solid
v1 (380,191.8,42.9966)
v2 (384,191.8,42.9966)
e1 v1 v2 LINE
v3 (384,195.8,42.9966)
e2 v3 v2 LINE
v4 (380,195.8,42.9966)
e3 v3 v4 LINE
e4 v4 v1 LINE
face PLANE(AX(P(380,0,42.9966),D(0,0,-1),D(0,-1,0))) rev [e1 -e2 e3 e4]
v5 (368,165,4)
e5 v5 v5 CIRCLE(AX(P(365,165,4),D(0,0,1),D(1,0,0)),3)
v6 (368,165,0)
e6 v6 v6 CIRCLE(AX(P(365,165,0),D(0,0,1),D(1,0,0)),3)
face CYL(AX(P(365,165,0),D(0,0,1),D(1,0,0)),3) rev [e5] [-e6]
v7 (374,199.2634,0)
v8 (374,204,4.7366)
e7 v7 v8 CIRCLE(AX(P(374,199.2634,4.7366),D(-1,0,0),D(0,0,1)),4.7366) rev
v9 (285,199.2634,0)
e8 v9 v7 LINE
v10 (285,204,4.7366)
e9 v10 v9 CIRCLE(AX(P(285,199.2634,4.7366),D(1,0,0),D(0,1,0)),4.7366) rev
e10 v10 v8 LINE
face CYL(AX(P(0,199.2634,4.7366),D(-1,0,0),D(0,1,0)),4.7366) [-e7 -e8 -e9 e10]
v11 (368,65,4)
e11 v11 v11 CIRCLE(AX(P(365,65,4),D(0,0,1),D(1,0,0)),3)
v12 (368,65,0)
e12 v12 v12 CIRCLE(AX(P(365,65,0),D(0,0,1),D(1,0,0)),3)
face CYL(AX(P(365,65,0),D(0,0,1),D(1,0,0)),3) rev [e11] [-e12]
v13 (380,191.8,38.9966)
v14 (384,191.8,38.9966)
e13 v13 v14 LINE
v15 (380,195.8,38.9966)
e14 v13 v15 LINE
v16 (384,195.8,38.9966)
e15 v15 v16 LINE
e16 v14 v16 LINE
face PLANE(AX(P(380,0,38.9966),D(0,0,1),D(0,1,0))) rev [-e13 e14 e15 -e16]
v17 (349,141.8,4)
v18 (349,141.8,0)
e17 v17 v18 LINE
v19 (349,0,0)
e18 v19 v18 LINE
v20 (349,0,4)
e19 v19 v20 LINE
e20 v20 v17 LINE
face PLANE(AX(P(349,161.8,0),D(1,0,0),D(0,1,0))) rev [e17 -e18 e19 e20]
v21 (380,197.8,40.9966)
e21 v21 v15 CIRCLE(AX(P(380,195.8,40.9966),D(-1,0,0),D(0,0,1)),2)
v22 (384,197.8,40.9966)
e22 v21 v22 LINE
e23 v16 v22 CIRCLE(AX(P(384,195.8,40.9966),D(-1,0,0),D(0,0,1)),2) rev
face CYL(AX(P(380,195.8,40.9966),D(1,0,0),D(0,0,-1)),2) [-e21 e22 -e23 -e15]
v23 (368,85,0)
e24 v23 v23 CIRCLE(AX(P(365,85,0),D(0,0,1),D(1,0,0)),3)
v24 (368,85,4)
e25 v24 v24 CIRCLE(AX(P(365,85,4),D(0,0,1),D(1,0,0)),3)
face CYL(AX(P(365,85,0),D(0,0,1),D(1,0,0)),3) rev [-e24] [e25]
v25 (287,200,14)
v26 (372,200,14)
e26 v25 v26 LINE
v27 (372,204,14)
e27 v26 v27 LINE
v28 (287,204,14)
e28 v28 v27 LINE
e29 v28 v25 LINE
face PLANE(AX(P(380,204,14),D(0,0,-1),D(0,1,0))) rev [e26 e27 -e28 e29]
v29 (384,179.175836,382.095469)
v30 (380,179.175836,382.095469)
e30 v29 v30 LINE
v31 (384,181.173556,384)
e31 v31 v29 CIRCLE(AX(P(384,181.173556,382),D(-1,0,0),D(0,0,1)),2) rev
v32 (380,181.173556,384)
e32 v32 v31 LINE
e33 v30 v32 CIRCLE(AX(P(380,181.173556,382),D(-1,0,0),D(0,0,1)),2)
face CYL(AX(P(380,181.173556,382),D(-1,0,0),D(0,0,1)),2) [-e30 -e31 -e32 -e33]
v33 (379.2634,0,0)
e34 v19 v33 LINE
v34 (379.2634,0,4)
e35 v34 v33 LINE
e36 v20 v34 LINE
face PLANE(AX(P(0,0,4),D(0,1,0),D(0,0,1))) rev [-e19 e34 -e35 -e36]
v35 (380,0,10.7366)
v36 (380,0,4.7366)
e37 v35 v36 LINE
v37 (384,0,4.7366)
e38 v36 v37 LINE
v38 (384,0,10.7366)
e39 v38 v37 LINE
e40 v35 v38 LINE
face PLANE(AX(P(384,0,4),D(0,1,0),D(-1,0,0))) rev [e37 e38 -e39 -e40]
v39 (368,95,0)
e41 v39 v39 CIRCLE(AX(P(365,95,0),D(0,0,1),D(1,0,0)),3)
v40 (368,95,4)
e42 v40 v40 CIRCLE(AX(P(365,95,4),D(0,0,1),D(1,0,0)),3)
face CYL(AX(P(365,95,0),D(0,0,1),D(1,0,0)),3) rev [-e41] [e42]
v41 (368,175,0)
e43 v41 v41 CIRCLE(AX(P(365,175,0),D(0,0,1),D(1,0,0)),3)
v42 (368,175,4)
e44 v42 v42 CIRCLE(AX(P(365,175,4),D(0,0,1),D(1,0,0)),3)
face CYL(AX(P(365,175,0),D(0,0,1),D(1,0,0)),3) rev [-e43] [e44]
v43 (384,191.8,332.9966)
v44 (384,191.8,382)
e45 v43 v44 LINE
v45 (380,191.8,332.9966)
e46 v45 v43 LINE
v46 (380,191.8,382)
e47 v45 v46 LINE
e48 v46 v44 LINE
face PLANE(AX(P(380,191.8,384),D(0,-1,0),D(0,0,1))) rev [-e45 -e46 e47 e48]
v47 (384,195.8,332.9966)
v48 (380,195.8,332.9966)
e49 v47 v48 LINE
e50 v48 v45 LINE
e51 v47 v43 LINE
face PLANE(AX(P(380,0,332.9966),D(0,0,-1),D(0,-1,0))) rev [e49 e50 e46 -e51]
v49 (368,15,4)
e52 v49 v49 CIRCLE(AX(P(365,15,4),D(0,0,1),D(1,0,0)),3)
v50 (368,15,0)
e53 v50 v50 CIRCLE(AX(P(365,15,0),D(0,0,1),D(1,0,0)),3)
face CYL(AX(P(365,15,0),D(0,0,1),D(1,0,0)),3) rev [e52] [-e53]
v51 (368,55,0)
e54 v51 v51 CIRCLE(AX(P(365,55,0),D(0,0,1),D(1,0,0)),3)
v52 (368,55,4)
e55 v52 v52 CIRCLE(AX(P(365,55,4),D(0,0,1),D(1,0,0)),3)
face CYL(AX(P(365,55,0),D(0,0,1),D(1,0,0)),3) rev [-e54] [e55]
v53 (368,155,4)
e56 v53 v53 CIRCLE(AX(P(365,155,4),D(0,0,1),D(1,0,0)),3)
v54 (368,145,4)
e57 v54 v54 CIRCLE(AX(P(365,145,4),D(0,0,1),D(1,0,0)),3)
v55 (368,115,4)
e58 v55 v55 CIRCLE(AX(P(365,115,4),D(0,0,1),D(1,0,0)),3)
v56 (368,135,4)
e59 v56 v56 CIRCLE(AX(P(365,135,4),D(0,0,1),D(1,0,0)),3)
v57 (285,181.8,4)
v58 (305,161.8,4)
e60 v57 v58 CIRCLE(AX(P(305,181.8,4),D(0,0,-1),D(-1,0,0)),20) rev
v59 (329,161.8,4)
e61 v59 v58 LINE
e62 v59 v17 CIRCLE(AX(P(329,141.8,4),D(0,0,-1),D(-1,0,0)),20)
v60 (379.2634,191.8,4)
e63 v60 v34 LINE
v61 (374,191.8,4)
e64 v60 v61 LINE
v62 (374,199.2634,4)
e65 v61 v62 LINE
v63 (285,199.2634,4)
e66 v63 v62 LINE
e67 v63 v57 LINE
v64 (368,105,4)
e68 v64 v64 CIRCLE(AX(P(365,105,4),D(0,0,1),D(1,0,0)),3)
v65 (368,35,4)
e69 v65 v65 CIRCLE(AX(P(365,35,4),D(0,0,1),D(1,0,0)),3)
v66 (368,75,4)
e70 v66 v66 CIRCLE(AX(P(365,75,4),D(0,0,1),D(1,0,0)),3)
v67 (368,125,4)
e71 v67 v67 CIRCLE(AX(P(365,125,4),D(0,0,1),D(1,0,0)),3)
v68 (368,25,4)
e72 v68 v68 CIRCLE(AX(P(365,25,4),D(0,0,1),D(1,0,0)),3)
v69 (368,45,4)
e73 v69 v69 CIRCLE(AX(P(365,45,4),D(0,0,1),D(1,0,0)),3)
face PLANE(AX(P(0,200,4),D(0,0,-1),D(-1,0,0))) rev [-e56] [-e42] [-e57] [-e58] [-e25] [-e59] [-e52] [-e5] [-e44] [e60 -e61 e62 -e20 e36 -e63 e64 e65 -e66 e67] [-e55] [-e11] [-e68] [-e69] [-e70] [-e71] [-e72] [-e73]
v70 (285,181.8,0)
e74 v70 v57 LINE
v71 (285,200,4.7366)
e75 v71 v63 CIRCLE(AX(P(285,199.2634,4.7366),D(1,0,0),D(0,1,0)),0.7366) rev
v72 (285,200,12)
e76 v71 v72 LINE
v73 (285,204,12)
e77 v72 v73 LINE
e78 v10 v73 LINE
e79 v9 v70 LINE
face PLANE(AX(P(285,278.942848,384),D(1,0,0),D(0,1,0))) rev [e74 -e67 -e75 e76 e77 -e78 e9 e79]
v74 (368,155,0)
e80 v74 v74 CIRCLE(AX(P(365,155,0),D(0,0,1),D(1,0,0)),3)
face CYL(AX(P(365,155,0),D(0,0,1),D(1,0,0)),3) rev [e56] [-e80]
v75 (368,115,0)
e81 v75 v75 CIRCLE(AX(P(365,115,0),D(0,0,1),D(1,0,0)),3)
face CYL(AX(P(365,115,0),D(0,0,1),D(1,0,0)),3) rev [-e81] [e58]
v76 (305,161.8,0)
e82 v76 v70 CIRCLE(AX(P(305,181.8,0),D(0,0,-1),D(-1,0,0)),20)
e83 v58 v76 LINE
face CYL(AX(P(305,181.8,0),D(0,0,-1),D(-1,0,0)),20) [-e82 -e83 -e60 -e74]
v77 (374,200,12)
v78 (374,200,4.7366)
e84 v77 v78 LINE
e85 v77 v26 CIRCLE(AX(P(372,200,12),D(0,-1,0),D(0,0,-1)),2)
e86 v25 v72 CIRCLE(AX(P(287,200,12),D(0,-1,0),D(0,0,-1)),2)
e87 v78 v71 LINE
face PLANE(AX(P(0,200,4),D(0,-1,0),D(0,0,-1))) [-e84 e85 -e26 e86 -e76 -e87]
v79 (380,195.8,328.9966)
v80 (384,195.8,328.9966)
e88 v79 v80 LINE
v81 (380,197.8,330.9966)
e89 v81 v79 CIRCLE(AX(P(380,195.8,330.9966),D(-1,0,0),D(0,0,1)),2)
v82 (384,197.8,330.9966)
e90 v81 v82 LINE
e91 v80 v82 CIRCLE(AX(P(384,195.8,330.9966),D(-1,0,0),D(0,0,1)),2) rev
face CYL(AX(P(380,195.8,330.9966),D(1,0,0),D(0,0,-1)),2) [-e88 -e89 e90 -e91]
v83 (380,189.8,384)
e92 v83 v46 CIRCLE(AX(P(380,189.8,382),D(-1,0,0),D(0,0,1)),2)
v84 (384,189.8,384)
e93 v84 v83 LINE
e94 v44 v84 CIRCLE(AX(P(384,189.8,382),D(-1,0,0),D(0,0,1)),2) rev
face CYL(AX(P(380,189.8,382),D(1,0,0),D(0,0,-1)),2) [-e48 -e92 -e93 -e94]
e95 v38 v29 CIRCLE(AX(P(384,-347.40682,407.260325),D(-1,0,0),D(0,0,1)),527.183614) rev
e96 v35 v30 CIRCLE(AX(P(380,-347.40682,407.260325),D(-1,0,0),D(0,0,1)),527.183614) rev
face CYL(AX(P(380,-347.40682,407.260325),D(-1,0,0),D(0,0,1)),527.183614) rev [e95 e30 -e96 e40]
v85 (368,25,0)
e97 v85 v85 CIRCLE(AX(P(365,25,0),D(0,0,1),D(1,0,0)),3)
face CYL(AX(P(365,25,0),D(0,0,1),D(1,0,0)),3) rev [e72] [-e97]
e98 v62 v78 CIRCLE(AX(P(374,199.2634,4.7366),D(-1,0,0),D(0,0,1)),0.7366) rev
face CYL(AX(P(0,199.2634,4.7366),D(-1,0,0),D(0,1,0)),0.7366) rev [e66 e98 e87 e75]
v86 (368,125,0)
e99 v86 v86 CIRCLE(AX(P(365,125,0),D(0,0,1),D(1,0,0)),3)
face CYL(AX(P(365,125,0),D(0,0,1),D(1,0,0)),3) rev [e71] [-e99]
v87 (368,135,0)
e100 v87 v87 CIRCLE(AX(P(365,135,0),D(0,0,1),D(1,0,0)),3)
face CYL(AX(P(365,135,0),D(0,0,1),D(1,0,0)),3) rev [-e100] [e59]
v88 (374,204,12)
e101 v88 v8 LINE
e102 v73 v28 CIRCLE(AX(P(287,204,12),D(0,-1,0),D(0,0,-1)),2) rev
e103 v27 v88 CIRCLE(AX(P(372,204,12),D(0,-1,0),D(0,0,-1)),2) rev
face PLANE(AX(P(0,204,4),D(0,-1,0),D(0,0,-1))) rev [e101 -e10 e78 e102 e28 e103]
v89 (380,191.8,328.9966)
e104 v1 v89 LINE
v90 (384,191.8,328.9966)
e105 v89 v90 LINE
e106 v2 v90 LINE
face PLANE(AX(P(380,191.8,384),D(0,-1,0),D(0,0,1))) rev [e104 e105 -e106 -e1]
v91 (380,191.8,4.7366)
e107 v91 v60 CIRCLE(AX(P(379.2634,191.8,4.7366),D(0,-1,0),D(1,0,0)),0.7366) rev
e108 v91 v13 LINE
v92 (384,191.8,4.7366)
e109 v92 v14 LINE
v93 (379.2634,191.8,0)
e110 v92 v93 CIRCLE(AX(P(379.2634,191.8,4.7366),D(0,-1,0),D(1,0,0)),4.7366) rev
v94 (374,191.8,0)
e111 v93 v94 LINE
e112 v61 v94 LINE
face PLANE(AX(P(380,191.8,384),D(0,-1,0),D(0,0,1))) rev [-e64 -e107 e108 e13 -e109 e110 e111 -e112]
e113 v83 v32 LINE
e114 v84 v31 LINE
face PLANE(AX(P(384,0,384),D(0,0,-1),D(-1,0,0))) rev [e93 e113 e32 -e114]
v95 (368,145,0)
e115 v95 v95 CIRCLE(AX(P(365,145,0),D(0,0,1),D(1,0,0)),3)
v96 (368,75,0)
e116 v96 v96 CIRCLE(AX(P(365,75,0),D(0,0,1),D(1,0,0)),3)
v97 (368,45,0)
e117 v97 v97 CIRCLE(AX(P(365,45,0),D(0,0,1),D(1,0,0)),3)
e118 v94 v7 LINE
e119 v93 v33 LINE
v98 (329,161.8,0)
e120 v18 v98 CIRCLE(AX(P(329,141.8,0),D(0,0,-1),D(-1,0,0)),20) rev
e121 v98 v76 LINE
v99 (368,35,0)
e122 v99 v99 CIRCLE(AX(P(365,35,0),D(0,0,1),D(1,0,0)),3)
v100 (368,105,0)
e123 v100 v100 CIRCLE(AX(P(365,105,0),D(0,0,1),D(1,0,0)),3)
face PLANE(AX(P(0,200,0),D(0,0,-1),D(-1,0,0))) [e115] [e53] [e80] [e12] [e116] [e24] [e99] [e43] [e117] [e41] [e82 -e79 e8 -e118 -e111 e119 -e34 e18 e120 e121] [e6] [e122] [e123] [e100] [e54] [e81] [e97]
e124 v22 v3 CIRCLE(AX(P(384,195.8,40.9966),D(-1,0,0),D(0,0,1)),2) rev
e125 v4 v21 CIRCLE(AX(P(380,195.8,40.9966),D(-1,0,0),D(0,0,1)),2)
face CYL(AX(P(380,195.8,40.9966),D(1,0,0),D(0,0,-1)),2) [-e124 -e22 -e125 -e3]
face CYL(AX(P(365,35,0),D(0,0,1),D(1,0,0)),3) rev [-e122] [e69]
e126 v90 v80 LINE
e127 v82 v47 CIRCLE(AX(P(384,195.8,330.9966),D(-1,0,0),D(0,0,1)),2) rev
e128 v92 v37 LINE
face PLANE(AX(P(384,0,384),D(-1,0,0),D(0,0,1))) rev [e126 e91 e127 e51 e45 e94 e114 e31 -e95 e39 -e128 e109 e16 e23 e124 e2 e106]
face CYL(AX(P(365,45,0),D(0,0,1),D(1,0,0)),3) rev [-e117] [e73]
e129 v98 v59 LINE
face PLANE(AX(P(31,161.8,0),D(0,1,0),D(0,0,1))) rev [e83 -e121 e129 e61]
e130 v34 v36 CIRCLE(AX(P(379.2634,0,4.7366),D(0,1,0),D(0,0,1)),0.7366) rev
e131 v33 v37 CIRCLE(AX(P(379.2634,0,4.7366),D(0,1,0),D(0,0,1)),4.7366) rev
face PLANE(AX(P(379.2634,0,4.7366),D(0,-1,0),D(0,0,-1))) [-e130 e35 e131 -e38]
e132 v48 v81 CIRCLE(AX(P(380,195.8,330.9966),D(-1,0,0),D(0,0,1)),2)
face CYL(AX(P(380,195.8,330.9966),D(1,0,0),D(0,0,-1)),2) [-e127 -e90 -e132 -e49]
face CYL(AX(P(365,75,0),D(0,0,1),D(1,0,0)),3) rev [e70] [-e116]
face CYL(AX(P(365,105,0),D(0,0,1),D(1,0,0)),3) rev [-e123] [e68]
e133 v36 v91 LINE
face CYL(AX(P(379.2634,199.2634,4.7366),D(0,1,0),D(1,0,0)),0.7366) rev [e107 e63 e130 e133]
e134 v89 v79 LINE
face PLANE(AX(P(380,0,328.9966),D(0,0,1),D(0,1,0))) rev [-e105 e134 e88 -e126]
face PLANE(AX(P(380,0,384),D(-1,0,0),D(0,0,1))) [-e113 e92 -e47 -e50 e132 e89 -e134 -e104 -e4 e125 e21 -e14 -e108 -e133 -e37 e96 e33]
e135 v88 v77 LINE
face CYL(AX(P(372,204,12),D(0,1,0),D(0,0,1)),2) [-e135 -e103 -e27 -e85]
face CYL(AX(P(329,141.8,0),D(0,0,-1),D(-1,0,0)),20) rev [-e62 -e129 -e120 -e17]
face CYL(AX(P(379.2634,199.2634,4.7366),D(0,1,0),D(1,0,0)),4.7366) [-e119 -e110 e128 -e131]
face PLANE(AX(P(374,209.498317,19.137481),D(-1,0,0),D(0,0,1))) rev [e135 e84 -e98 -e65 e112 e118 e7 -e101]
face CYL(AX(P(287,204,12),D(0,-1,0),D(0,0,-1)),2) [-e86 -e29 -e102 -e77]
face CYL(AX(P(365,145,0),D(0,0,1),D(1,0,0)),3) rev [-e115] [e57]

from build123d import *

# Parameters (mm, degrees)
SKETCH1_W                    = 380
SKETCH1_H                    = 200
BASE_FLANGE1_DEPTH           = 4
EDGE_FLANGE1_STRIP_W         = 17.4732
EDGE_FLANGE1_STRIP_H         = 4
EDGE_FLANGE1_STRIP_CUT_DEPTH = 380
EDGE_FLANGE1_DEPTH           = 380
EDGE_FLANGE2_STRIP_W         = 17.4732
EDGE_FLANGE2_STRIP_H         = 4
EDGE_FLANGE2_STRIP_CUT_DEPTH = 199.2634
EDGE_FLANGE2_DEPTH           = 199.2634
EDGE_FLANGE3_STRIP_W         = 17.4732
EDGE_FLANGE3_STRIP_H         = 4
EDGE_FLANGE3_STRIP_CUT_DEPTH = 199.2634
EDGE_FLANGE3_DEPTH           = 199.2634
EXTRUDE1_DEPTH               = 583.765819176
EXTRUDE2_DEPTH               = 583.765819176
FILLET1_R                    = 2
SKETCH15_W                   = 23.472504697
SKETCH15_H                   = 33.276719244
EXTRUDE6_DEPTH               = 10
SKETCH16_W                   = 26.053110818
SKETCH16_H                   = 17.698317339
EXTRUDE7_DEPTH               = 10
FILLET2_R                    = 2
SKETCH17_W                   = 318
SKETCH17_H                   = 161.8
EXTRUDE8_DEPTH               = 578.470345559
FILLET3_R                    = 20
SKETCH18_R                   = 3
EXTRUDE9_DEPTH               = 578.470345559
LPATTERN1_COUNT              = 17
LPATTERN1_PITCH              = 10
SKETCH20_W                   = 800
SKETCH20_H                   = 800
EXTRUDE15_DEPTH              = 581.110334333
FILLET4_R                    = 20
FILLET5_R                    = 2
FILLET6_R                    = 2


# Sheet-metal steps are written as plain solids
with BuildPart() as part:
    # Sketch1 → Base-Flange1 (new body)
    with BuildSketch(Plane.XY):
        with Locations((190, 100)):
            Rectangle(SKETCH1_W, SKETCH1_H)
    extrude(amount=BASE_FLANGE1_DEPTH)

    # Edge-Flange1 strip (across the edge) → Edge-Flange1 strip cut (cut)
    with BuildSketch(Plane(origin=(380, 200, 4), x_dir=(0, -1, 0), z_dir=(-1, 0, 0))):
        with Locations((-8, -2)):
            Rectangle(EDGE_FLANGE1_STRIP_W, EDGE_FLANGE1_STRIP_H)
    extrude(amount=EDGE_FLANGE1_STRIP_CUT_DEPTH, mode=Mode.SUBTRACT)

    # Edge-Flange1 section (across the edge) → Edge-Flange1 (add)
    with BuildSketch(Plane(origin=(380, 200, 4), x_dir=(0, -1, 0), z_dir=(-1, 0, 0))):
        with BuildLine():
            Line((-4, 0.7366), (-4, 10))
            Line((-4, 10), (0, 10))
            Line((0, 10), (0, 0.7366))
            ThreePointArc((0, 0.7366), (0.215745145, 0.215745145), (0.7366, 0))
            Line((0.7366, 0), (0.7366, -4))
            ThreePointArc((0.7366, -4), (-2.61268198, -2.61268198), (-4, 0.7366))
        make_face()
    extrude(amount=EDGE_FLANGE1_DEPTH)

    # Edge-Flange2 strip (across the edge) → Edge-Flange2 strip cut (cut)
    with BuildSketch(Plane(origin=(0, 199.2634, 4), x_dir=(1, 0, 0), z_dir=(0, -1, 0))):
        with Locations((-8, -2)):
            Rectangle(EDGE_FLANGE2_STRIP_W, EDGE_FLANGE2_STRIP_H)
    extrude(amount=EDGE_FLANGE2_STRIP_CUT_DEPTH, mode=Mode.SUBTRACT)

    # Edge-Flange2 section (across the edge) → Edge-Flange2 (add)
    with BuildSketch(Plane(origin=(0, 199.2634, 4), x_dir=(1, 0, 0), z_dir=(0, -1, 0))):
        with BuildLine():
            Line((-4, 0.7366), (-4, 380))
            Line((-4, 380), (0, 380))
            Line((0, 380), (0, 0.7366))
            ThreePointArc((0, 0.7366), (0.215745145, 0.215745145), (0.7366, 0))
            Line((0.7366, 0), (0.7366, -4))
            ThreePointArc((0.7366, -4), (-2.61268198, -2.61268198), (-4, 0.7366))
        make_face()
    extrude(amount=EDGE_FLANGE2_DEPTH)

    # Edge-Flange3 strip (across the edge) → Edge-Flange3 strip cut (cut)
    with BuildSketch(Plane(origin=(380, 0, 4), x_dir=(-1, 0, 0), z_dir=(0, 1, 0))):
        with Locations((-8, -2)):
            Rectangle(EDGE_FLANGE3_STRIP_W, EDGE_FLANGE3_STRIP_H)
    extrude(amount=EDGE_FLANGE3_STRIP_CUT_DEPTH, mode=Mode.SUBTRACT)

    # Edge-Flange3 section (across the edge) → Edge-Flange3 (add)
    with BuildSketch(Plane(origin=(380, 0, 4), x_dir=(-1, 0, 0), z_dir=(0, 1, 0))):
        with BuildLine():
            Line((-4, 0.7366), (-4, 380))
            Line((-4, 380), (0, 380))
            Line((0, 380), (0, 0.7366))
            ThreePointArc((0, 0.7366), (0.215745145, 0.215745145), (0.7366, 0))
            Line((0.7366, 0), (0.7366, -4))
            ThreePointArc((0.7366, -4), (-2.61268198, -2.61268198), (-4, 0.7366))
        make_face()
    extrude(amount=EDGE_FLANGE3_DEPTH)

    # Sketch12 → Extrude1 (cut, through all)
    with BuildSketch(Plane.ZY.offset(4)):
        with BuildLine():
            ThreePointArc((384, 179.2634), (179.031265067, 127.81319162), (10.7366, 0))
            Line((10.7366, 0), (384, 0))
            Line((384, 0), (384, 179.2634))
        make_face()
    extrude(amount=-EXTRUDE1_DEPTH, mode=Mode.SUBTRACT)

    # Sketch13 → Extrude2 (cut, through all)
    with BuildSketch(Plane.ZY.offset(4)):
        Polygon((14.85780282, 191.8), (38.9966, 191.8), (38.9966, 197.8), (42.9966, 197.8), (42.9966, 191.8), (328.9966, 191.8), (328.9966, 197.8), (332.9966, 197.8), (332.9966, 191.8), (384, 191.8), (384, 199.2634), (4.7366, 199.2634), (4.7366, 191.8), align=None)
    extrude(amount=-EXTRUDE2_DEPTH, mode=Mode.SUBTRACT)

    # Fillet1
    fillet1_edges = [part.edges().sort_by_distance(p)[0] for p in [
        (382, 197.8, 38.9966),
        (382, 197.8, 42.9966),
        (382, 197.8, 328.9966),
        (382, 197.8, 332.9966),
        (-2, 197.8, 328.9966),
        (-2, 197.8, 332.9966),
        (-2, 197.8, 42.9966),
        (-2, 197.8, 38.9966),
    ]]
    fillet(fillet1_edges, radius=FILLET1_R - 0.0001)  # a hair under: the kernel refuses the full size

    # Sketch15 → Extrude6 (cut)
    with BuildSketch(Plane.ZY.offset(4)):
        with Locations((8.784947937, 208.438359622)):
            Rectangle(SKETCH15_W, SKETCH15_H)
    extrude(amount=-EXTRUDE6_DEPTH, mode=Mode.SUBTRACT)

    # Sketch16 → Extrude7 (cut)
    with BuildSketch(Plane(origin=(384, 0, 0), x_dir=(0, 0, -1), z_dir=(1, 0, 0))):
        with Locations((-6.110925327, 200.64915867)):
            Rectangle(SKETCH16_W, SKETCH16_H)
    extrude(amount=-EXTRUDE7_DEPTH, mode=Mode.SUBTRACT)

    # Fillet2
    fillet2_edges = [part.edges().sort_by_distance(p)[0] for p in [
        (6, 202, 14),
        (374, 202, 14),
    ]]
    fillet(fillet2_edges, radius=FILLET2_R)

    # Sketch17 → Extrude8 (cut, through all)
    with BuildSketch(Plane.XY.offset(4)):
        with Locations((190, 80.9)):
            Rectangle(SKETCH17_W, SKETCH17_H)
    extrude(amount=-EXTRUDE8_DEPTH, mode=Mode.SUBTRACT)

    # Fillet3
    fillet3_edges = [part.edges().sort_by_distance(p)[0] for p in [
        (31, 161.8, 2),
        (349, 161.8, 2),
    ]]
    fillet(fillet3_edges, radius=FILLET3_R)

    # Sketch18 → Extrude9 (cut, through all)
    with BuildSketch(Plane.XY.offset(4)):
        with Locations((15, 175)):
            Circle(SKETCH18_R)
        with Locations((365, 175)):
            Circle(SKETCH18_R)
    extrude9 = extrude(amount=-EXTRUDE9_DEPTH, mode=Mode.SUBTRACT)

    # LPattern1: Extrude9 ×17
    with Locations(*[(0, -i * LPATTERN1_PITCH, 0) for i in range(1, LPATTERN1_COUNT)]):
        add(extrude9, mode=Mode.SUBTRACT)

    # Sketch20 → Extrude15 (cut, through all)
    with BuildSketch(Plane(origin=(0, 0, 0), x_dir=(-1, 0, 0), z_dir=(0, 0, -1))):
        with Locations((115, -121.057151892)):
            Rectangle(SKETCH20_W, SKETCH20_H)
    extrude(amount=-EXTRUDE15_DEPTH, mode=Mode.SUBTRACT)

    # Fillet4
    fillet4_edges = [part.edges().sort_by_distance(p)[0] for p in [
        (285, 161.8, 2),
    ]]
    fillet(fillet4_edges, radius=FILLET4_R)

    # Fillet5
    fillet5_edges = [part.edges().sort_by_distance(p)[0] for p in [
        (285, 202, 14),
    ]]
    fillet(fillet5_edges, radius=FILLET5_R)

    # Fillet6
    fillet6_edges = [part.edges().sort_by_distance(p)[0] for p in [
        (382, 179.2634, 384),
        (382, 191.8, 384),
    ]]
    fillet(fillet6_edges, radius=FILLET6_R)


solid = part.part
